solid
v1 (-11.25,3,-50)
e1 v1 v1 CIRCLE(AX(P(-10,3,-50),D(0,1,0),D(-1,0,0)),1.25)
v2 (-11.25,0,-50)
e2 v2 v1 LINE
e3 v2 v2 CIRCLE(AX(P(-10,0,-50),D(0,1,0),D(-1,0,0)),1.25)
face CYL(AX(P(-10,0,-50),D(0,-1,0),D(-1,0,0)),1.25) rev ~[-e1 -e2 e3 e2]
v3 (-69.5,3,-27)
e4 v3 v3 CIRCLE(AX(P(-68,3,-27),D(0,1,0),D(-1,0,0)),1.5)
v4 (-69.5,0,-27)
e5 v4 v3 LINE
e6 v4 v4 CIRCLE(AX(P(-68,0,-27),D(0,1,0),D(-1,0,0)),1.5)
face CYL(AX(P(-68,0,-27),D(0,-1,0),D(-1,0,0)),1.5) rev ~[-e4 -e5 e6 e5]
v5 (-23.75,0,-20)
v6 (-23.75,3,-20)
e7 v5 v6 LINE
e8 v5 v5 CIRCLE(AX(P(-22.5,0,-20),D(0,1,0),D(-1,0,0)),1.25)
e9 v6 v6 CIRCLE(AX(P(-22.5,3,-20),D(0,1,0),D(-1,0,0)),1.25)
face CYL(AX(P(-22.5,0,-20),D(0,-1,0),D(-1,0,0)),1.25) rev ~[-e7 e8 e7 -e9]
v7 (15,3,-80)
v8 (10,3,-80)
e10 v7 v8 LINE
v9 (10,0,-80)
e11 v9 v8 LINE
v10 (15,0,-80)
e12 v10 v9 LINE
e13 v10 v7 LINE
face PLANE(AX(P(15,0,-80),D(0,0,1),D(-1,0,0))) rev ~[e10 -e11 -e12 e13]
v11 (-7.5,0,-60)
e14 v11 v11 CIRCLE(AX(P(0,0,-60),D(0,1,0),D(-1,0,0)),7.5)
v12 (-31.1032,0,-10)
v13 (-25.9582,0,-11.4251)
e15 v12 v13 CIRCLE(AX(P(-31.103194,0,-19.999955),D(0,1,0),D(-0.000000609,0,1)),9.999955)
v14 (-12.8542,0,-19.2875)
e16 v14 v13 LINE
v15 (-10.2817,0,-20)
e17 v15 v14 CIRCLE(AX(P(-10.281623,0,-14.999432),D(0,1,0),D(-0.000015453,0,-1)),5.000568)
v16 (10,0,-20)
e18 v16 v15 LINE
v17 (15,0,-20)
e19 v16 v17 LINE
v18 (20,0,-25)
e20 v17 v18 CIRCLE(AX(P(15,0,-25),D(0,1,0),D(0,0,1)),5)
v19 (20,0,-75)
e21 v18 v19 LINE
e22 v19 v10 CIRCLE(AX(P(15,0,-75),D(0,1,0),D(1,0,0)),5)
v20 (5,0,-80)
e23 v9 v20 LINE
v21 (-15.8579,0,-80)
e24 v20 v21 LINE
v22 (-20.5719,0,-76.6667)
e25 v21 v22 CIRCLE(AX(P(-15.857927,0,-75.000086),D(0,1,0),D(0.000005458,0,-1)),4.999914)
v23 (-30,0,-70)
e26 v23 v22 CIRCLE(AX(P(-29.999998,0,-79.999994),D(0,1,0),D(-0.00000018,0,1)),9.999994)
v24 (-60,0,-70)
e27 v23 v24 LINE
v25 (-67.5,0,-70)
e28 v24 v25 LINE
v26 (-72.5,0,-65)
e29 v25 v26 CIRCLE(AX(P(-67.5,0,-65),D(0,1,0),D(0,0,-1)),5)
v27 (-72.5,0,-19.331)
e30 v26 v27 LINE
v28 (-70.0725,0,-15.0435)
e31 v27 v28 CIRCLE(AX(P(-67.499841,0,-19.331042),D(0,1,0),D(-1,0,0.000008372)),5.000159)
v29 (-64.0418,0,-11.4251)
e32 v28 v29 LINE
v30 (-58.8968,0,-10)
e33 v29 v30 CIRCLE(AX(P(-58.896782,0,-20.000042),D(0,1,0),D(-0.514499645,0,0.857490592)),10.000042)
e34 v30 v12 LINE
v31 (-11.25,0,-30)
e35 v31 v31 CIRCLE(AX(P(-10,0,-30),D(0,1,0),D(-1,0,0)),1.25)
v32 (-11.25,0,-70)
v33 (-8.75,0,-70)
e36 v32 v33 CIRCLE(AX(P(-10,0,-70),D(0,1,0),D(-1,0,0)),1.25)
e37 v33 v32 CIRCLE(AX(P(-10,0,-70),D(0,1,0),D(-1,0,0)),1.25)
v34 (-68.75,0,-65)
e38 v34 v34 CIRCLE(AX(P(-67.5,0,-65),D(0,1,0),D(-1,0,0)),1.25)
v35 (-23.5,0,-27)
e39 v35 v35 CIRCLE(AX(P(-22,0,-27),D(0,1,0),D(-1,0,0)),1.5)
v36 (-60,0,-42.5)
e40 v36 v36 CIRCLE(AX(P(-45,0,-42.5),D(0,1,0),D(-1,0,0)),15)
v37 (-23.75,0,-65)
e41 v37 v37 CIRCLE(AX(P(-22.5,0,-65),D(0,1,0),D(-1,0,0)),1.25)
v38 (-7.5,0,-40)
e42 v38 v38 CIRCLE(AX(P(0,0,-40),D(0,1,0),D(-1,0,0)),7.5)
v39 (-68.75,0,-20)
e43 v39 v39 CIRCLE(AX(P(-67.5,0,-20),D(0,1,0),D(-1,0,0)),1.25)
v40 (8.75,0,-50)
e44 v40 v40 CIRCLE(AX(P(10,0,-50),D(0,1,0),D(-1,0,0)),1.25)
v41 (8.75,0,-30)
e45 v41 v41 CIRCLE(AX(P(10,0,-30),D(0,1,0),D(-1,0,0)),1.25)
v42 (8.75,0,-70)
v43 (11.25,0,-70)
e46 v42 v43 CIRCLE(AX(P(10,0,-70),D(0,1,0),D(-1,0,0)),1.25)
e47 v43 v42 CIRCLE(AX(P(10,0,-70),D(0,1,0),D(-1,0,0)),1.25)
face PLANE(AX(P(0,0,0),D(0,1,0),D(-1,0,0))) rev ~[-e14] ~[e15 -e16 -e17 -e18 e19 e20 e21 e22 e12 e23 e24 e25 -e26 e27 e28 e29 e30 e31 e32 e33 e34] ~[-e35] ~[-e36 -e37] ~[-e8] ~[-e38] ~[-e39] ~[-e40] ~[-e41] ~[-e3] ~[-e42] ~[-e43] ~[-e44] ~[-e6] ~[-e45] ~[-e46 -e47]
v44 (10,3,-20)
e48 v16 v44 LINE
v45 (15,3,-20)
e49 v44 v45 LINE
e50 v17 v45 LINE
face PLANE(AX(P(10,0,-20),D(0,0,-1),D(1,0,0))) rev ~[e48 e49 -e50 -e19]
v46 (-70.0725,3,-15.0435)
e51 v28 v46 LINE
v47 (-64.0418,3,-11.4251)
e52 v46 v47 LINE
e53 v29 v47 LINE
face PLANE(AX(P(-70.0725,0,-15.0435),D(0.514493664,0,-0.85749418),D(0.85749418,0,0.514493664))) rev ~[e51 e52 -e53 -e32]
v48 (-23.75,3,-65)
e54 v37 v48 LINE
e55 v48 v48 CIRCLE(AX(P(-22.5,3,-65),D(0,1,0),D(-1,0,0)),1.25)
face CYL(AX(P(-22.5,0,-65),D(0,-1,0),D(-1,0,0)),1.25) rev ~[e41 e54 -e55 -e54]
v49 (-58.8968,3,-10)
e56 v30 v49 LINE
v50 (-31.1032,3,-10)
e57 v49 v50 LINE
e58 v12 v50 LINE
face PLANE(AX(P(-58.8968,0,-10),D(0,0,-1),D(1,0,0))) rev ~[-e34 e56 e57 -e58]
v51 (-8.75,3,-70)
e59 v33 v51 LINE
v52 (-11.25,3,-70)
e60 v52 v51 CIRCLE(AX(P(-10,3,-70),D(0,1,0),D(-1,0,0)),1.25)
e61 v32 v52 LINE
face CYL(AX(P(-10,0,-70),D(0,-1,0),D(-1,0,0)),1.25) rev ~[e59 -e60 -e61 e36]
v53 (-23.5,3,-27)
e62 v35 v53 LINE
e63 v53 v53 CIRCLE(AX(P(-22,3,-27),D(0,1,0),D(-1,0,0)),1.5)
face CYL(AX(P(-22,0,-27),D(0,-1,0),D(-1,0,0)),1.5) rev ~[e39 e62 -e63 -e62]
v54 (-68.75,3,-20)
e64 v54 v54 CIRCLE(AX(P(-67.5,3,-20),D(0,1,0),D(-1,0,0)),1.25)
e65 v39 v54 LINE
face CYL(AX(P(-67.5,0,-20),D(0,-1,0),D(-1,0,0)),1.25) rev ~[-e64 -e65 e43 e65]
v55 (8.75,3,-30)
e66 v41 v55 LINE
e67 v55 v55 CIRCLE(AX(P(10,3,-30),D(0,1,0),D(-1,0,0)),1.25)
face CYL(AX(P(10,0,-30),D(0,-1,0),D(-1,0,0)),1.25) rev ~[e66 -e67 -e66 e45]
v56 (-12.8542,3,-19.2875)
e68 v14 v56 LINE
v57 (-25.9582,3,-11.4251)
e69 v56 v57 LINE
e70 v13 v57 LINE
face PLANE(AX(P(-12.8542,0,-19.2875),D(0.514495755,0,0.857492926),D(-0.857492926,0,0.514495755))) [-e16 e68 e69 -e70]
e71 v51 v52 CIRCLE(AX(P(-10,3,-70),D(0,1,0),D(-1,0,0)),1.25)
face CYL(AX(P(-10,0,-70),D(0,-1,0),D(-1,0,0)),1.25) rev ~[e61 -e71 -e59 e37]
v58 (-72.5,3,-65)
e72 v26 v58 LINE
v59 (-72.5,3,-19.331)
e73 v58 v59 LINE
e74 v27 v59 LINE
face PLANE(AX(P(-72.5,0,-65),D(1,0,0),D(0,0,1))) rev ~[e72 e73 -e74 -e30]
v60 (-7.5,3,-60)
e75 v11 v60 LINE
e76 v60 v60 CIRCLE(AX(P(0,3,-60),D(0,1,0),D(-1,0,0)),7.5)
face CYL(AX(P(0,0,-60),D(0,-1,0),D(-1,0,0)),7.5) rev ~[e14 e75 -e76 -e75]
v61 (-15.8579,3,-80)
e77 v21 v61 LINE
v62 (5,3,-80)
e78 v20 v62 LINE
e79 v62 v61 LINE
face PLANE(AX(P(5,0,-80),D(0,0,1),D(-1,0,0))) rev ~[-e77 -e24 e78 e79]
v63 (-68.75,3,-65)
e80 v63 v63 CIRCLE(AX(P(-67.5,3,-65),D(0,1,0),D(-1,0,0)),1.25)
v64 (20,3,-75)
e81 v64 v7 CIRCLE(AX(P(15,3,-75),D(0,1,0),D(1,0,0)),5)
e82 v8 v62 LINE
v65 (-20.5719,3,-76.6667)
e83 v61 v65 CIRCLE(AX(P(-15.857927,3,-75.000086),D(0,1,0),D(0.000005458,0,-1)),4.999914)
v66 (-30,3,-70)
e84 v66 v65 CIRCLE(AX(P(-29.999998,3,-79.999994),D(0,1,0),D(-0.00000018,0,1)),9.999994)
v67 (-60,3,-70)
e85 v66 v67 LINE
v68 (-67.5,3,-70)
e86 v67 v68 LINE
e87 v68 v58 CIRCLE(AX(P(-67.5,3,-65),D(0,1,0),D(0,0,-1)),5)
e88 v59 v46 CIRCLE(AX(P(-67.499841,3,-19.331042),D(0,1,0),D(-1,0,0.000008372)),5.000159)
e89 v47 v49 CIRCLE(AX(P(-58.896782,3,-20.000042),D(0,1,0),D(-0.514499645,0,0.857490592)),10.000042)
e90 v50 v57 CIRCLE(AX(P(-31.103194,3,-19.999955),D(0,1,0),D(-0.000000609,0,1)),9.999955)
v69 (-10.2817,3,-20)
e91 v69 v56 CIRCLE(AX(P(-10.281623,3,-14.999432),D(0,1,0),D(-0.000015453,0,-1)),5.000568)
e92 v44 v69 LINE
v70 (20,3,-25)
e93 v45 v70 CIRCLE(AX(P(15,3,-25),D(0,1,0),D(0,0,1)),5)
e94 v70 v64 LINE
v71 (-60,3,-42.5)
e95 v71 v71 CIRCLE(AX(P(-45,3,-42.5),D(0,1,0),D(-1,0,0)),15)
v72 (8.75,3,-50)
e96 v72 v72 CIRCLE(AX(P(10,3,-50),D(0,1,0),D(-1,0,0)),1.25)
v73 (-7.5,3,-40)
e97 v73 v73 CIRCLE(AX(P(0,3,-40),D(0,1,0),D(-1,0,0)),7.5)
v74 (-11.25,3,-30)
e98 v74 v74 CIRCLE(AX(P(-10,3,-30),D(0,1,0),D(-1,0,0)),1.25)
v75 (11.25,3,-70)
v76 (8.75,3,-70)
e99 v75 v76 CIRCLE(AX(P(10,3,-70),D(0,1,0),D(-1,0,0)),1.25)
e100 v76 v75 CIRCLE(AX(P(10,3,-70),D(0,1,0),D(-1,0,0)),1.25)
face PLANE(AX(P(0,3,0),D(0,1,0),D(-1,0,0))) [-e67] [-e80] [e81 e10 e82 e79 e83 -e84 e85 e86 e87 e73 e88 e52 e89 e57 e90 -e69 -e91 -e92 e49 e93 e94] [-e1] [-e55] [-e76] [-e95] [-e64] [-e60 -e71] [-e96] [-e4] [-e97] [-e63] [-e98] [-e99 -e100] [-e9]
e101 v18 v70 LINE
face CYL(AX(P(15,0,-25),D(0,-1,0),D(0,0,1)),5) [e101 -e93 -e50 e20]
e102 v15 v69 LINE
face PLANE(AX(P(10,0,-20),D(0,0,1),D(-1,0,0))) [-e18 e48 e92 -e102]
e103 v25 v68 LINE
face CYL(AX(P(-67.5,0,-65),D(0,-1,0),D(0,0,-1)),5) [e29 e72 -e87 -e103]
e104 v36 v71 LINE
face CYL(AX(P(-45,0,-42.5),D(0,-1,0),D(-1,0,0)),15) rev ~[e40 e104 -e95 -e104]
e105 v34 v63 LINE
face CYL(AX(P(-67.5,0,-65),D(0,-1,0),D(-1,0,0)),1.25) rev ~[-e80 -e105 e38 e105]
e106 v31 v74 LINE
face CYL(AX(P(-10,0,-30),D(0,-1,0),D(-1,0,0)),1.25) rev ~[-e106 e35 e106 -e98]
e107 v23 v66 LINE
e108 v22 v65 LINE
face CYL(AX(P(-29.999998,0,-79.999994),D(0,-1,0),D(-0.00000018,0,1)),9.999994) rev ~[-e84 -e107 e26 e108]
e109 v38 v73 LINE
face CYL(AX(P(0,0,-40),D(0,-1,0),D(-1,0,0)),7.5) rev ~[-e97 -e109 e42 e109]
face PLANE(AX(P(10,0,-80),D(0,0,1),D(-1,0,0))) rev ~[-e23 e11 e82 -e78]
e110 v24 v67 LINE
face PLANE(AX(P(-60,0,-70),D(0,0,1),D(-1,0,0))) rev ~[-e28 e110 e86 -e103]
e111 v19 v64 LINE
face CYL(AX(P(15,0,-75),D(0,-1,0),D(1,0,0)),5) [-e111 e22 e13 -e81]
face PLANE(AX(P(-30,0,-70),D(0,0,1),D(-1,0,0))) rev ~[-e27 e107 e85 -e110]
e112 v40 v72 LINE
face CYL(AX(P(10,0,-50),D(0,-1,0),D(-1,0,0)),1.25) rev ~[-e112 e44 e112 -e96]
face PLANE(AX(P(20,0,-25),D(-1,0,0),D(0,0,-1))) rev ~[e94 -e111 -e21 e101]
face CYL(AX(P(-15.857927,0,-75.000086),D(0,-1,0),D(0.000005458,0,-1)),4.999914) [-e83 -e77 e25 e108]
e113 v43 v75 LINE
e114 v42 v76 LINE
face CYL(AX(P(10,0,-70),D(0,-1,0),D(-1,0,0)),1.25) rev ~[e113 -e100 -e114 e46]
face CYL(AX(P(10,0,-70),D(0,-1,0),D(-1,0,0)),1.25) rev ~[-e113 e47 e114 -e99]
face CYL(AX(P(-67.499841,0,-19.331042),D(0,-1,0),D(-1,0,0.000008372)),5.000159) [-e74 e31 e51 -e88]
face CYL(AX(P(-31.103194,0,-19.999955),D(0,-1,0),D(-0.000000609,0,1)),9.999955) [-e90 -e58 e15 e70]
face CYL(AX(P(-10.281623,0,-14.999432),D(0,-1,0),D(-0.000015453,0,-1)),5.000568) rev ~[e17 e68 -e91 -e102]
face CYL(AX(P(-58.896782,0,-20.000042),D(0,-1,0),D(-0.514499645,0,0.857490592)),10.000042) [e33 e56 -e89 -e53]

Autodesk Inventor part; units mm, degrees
ref_plane "YZ Plane" through (0, 0, 0) normal (1, 0, 0) x (0, 1, 0)
ref_plane "XZ Plane" through (0, 0, 0) normal (0, 1, 0) x (-1, 0, 0)
ref_plane "XY Plane" through (0, 0, 0) normal (0, 0, 1) x (1, 0, 0)
sketch "Sketch1" plane through (0, 0, 0) normal (0, 1, 0) x (-1, 0, 0)
  line L0 (10, 0) -> (80, 0)
  line L1 (90, -32.6619) -> (90, -167.3381)
  line L2 (67, -200) -> (23, -200)
  line L3 (0, -167.3381) -> (0, -85)
  line L4 (68, -27) -> (68, -173) construction
  line L5 (68, -173) -> (22, -173) construction
  line L6 (22, -173) -> (22, -27) construction
  circle A0 centre (68, -27) radius 1.5
  circle A1 centre (68, -173) radius 1.5
  circle A2 centre (22, -173) radius 1.5
  circle A3 centre (22, -27) radius 1.5
  line L7 (30, -70) -> (60, -70)
  line L8 (70, -80) -> (70, -120)
  line L9 (60, -130) -> (30, -130)
  line L10 (20, -120) -> (20, -80)
  arc A4 (70, -80) -> (60, -70) centre (60, -80) ccw
  arc A5 (60, -130) -> (70, -120) centre (60, -120) ccw
  arc A6 (20, -120) -> (30, -130) centre (30, -120) ccw
  arc A7 (30, -70) -> (20.5719, -76.6667) centre (30, -80) ccw
  arc A8 (90, -10) -> (80, 0) centre (80, -10) ccw
  arc A9 (0, -190) -> (10, -200) centre (10, -190) ccw
  arc A10 (80, -200) -> (90, -190) centre (80, -190) ccw
  arc A11 (10, 0) -> (0, -10) centre (10, -10) ccw
  circle A12 centre (80, -10) radius 1.25
  circle A13 centre (80, -30) radius 1.25
  circle A14 centre (80, -50) radius 1.25
  circle A15 centre (80, -70) radius 1.25
  circle A16 centre (80, -90) radius 1.25
  circle A17 centre (80, -110) radius 1.25
  circle A18 centre (80, -130) radius 1.25
  circle A19 centre (80, -150) radius 1.25
  circle A20 centre (80, -170) radius 1.25
  circle A21 centre (80, -190) radius 1.25
  circle A22 centre (10, -10) radius 1.25
  circle A23 centre (10, -30) radius 1.25
  circle A24 centre (10, -50) radius 1.25
  circle A25 centre (10, -70) radius 1.25
  circle A26 centre (10, -90) radius 1.25
  circle A27 centre (10, -110) radius 1.25
  circle A28 centre (10, -130) radius 1.25
  circle A29 centre (10, -150) radius 1.25
  circle A30 centre (10, -170) radius 1.25
  circle A31 centre (10, -190) radius 1.25
  circle A32 centre (81, -111) radius 3.5
  circle A33 centre (81.25, -89) radius 3.5
  circle A34 centre (9, -111) radius 3.5
  circle A35 centre (9, -89) radius 3.5
  line L11 (70.0725, -15.0435) -> (64.0418, -11.4251)
  line L12 (12.8542, -19.2875) -> (25.9582, -11.4251)
  arc A36 (90, -32.6619) -> (85.145, -24.087) centre (80, -32.6619) ccw
  arc A37 (4.855, -24.087) -> (0, -32.6619) centre (10, -32.6619) ccw construction
  circle A38 centre (67.5, -65) radius 1.25
  circle A39 centre (22.5, -65) radius 1.25
  line L13 (-15, -70) -> (15, -70)
  circle A40 centre (67.5, -20) radius 1.25
  line L14 (30, -25) -> (60, -25)
  circle A41 centre (22.5, -20) radius 1.25
  line L15 (-15, -25) -> (15, -25) construction
  line L16 (58.8968, -10) -> (31.1032, -10)
  arc A42 (64.0418, -11.4251) -> (58.8968, -10) centre (58.8968, -20) ccw
  arc A43 (31.1032, -10) -> (25.9582, -11.4251) centre (31.1032, -20) ccw
  line L17 (90, -200) -> (72, -200) construction
  line L18 (72, -195) -> (72, -185)
  line L19 (77, -180) -> (85, -180)
  line L20 (90, -175) -> (90, -167.3381)
  line L21 (0, -200) -> (18, -200) construction
  line L22 (18, -195) -> (18, -185)
  line L23 (13, -180) -> (5, -180)
  line L24 (0, -175) -> (0, -167.3381)
  arc A44 (77, -180) -> (72, -185) centre (77, -185) ccw
  arc A45 (85, -180) -> (90, -175) centre (85, -175) ccw
  arc A46 (0, -175) -> (5, -180) centre (5, -175) ccw
  arc A47 (18, -185) -> (13, -180) centre (13, -185) ccw
  arc A48 (67, -200) -> (72, -195) centre (67, -195) ccw
  arc A49 (18, -195) -> (23, -200) centre (23, -195) ccw
  circle A50 centre (69.1385, -144.2) radius 1.25
  circle A51 centre (20.8615, -144.2) radius 1.25
  circle A52 centre (53.8985, -195) radius 1.25
  line L25 (10, -30) -> (-10, -30) construction
  line L26 (-10, -30) -> (-10, -50) construction
  line L27 (-10, -50) -> (10, -50) construction
  line L28 (10, -50) -> (10, -30) construction
  circle A53 centre (-10, -50) radius 1.25
  circle A54 centre (-10, -30) radius 1.25
  line L29 (-10, -30) -> (-10, -20) construction
  line L30 (-10, -20) -> (10.2817, -20)
  line L31 (-10, -20) -> (-15, -20)
  line L32 (-20, -25) -> (-20, -75)
  line L33 (-15, -80) -> (-5, -80)
  arc A55 (-15, -20) -> (-20, -25) centre (-15, -25) ccw
  arc A56 (-20, -75) -> (-15, -80) centre (-15, -75) ccw
  arc A57 (0, -85) -> (-5, -80) centre (-5, -85) ccw
  arc A58 (10.2817, -20) -> (12.8542, -19.2875) centre (10.2817, -15) ccw
  line L34 (-10, -50) -> (-10, -70) construction
  circle A59 centre (-10, -70) radius 1.25
  line L35 (-10, -80) -> (15.8579, -80)
  line L36 (60, -70) -> (67.5, -70)
  line L37 (72.5, -65) -> (72.5, -19.331)
  arc A60 (72.5, -19.331) -> (70.0725, -15.0435) centre (67.5, -19.331) ccw
  arc A61 (67.5, -70) -> (72.5, -65) centre (67.5, -65) ccw
  arc A62 (15.8579, -80) -> (20.5719, -76.6667) centre (15.8579, -75) ccw
  line L38 (10, -70) -> (-10, -50) construction
  line L39 (10, -30) -> (-10, -50) construction
  circle A63 centre (0, -60) radius 7.5
  circle A64 centre (0, -40) radius 7.5
  line L40 (67.5, -65) -> (22.5, -20) construction
  circle A65 centre (45, -42.5) radius 15
  point P0 (0, 0)
  point P1 (90, 0)
  point P2 (70, -130)
  point P3 (70, -70)
  point P4 (20, -130)
  point P5 (45, 0)
  point P6 (45, -200)
  point P7 (25, -70)
  point P8 (70, -25)
  point P9 (25, -25)
  point P10 (72, -180)
  point P11 (-20, -20)
  point P12 (-20, -80)
  point P13 (72.5, -70)
  dimension "d0" = 90
  dimension "d1" = 200
  dimension "d2" = 46
  dimension "d4" = 22
  dimension "d5" = 27
  dimension "d7" = 3
  dimension "d8" = 3
  dimension "d10" = 50
  dimension "d11" = 60
  dimension "d12" = 20
  dimension "d13" = 70
  dimension "d14" = 10
  dimension "d15" = 10
  dimension "d16" = 2.5
  dimension "d19" = 20
  dimension "d24" = 2.5
  dimension "d27" = 20
  dimension "d34" = 7
  dimension "d35" = 7
  dimension "d36" = 7
  dimension "d37" = 7
  dimension "d38" = 72
  dimension "d39" = 22
  dimension "d40" = 9
  dimension "d41" = 89
  dimension "d42" = 22
  dimension "d43" = 72
  dimension "d46" = 10
  dimension "d48" = 2.5
  dimension "d51" = 45
  dimension "d54" = 45
  dimension "d57" = 22.5
  dimension "d58" = 5
  dimension "d71" = 18
  dimension "d72" = 20
  dimension "d73" = 18
  dimension "d74" = 5
  dimension "d75" = 5
  dimension "d76" = 2.5
  dimension "d77" = 2.5
  dimension "d78" = 0
  dimension "d79" = 48.277
  dimension "d81" = 20.8615
  dimension "d82" = 2.5
  dimension "d83" = 15.24
  dimension "d84" = 50.8
  dimension "d85" = 5
  dimension "d86" = 20
  dimension "d87" = 20
  dimension "d88" = 2.5
  dimension "d89" = 2.5
  dimension "d92" = 10
  dimension "d93" = 10
  dimension "d94" = 60
  dimension "d95" = 5
  dimension "d96" = 5
  dimension "d97" = 20
  dimension "d98" = 2.5
  dimension "d99" = 12.5
  dimension "d100" = 5
  dimension "d101" = 5
  dimension "d102" = 15
  dimension "d103" = 15
  dimension "d104" = 30
extrude "Extrusion2" add sketch "Sketch1" along normal blind 3 contours A7 A62 L35 L33 A56 L32 A55 L31 L30 A58 L12 A43 L16 A42 L11 A60 L37 A61 L36 L7
equation "\"d4\" = -0.5 * d2 + 0.5 * d0"
equation "\"d5\" = -0.5 * d3 + 0.5 * d1"
equation "\"d12\" = -0.5 * d10 + 0.5 * d0"
equation "\"d13\" = -0.5 * d11 + 0.5 * d1"
equation "\"d40\" = -0.5 * d38 + 0.5 * d0"
equation "\"d41\" = -0.5 * d39 + 0.5 * d1"
equation "\"d57\" = -0.5 * d51 + 0.5 * d0"
equation "\"d81\" = -0.5 * d79 + 0.5 * d0"
equation "\"d3\" = 146"
properties part number "TransmissionDeck" material "Polycarbonate, Clear"
